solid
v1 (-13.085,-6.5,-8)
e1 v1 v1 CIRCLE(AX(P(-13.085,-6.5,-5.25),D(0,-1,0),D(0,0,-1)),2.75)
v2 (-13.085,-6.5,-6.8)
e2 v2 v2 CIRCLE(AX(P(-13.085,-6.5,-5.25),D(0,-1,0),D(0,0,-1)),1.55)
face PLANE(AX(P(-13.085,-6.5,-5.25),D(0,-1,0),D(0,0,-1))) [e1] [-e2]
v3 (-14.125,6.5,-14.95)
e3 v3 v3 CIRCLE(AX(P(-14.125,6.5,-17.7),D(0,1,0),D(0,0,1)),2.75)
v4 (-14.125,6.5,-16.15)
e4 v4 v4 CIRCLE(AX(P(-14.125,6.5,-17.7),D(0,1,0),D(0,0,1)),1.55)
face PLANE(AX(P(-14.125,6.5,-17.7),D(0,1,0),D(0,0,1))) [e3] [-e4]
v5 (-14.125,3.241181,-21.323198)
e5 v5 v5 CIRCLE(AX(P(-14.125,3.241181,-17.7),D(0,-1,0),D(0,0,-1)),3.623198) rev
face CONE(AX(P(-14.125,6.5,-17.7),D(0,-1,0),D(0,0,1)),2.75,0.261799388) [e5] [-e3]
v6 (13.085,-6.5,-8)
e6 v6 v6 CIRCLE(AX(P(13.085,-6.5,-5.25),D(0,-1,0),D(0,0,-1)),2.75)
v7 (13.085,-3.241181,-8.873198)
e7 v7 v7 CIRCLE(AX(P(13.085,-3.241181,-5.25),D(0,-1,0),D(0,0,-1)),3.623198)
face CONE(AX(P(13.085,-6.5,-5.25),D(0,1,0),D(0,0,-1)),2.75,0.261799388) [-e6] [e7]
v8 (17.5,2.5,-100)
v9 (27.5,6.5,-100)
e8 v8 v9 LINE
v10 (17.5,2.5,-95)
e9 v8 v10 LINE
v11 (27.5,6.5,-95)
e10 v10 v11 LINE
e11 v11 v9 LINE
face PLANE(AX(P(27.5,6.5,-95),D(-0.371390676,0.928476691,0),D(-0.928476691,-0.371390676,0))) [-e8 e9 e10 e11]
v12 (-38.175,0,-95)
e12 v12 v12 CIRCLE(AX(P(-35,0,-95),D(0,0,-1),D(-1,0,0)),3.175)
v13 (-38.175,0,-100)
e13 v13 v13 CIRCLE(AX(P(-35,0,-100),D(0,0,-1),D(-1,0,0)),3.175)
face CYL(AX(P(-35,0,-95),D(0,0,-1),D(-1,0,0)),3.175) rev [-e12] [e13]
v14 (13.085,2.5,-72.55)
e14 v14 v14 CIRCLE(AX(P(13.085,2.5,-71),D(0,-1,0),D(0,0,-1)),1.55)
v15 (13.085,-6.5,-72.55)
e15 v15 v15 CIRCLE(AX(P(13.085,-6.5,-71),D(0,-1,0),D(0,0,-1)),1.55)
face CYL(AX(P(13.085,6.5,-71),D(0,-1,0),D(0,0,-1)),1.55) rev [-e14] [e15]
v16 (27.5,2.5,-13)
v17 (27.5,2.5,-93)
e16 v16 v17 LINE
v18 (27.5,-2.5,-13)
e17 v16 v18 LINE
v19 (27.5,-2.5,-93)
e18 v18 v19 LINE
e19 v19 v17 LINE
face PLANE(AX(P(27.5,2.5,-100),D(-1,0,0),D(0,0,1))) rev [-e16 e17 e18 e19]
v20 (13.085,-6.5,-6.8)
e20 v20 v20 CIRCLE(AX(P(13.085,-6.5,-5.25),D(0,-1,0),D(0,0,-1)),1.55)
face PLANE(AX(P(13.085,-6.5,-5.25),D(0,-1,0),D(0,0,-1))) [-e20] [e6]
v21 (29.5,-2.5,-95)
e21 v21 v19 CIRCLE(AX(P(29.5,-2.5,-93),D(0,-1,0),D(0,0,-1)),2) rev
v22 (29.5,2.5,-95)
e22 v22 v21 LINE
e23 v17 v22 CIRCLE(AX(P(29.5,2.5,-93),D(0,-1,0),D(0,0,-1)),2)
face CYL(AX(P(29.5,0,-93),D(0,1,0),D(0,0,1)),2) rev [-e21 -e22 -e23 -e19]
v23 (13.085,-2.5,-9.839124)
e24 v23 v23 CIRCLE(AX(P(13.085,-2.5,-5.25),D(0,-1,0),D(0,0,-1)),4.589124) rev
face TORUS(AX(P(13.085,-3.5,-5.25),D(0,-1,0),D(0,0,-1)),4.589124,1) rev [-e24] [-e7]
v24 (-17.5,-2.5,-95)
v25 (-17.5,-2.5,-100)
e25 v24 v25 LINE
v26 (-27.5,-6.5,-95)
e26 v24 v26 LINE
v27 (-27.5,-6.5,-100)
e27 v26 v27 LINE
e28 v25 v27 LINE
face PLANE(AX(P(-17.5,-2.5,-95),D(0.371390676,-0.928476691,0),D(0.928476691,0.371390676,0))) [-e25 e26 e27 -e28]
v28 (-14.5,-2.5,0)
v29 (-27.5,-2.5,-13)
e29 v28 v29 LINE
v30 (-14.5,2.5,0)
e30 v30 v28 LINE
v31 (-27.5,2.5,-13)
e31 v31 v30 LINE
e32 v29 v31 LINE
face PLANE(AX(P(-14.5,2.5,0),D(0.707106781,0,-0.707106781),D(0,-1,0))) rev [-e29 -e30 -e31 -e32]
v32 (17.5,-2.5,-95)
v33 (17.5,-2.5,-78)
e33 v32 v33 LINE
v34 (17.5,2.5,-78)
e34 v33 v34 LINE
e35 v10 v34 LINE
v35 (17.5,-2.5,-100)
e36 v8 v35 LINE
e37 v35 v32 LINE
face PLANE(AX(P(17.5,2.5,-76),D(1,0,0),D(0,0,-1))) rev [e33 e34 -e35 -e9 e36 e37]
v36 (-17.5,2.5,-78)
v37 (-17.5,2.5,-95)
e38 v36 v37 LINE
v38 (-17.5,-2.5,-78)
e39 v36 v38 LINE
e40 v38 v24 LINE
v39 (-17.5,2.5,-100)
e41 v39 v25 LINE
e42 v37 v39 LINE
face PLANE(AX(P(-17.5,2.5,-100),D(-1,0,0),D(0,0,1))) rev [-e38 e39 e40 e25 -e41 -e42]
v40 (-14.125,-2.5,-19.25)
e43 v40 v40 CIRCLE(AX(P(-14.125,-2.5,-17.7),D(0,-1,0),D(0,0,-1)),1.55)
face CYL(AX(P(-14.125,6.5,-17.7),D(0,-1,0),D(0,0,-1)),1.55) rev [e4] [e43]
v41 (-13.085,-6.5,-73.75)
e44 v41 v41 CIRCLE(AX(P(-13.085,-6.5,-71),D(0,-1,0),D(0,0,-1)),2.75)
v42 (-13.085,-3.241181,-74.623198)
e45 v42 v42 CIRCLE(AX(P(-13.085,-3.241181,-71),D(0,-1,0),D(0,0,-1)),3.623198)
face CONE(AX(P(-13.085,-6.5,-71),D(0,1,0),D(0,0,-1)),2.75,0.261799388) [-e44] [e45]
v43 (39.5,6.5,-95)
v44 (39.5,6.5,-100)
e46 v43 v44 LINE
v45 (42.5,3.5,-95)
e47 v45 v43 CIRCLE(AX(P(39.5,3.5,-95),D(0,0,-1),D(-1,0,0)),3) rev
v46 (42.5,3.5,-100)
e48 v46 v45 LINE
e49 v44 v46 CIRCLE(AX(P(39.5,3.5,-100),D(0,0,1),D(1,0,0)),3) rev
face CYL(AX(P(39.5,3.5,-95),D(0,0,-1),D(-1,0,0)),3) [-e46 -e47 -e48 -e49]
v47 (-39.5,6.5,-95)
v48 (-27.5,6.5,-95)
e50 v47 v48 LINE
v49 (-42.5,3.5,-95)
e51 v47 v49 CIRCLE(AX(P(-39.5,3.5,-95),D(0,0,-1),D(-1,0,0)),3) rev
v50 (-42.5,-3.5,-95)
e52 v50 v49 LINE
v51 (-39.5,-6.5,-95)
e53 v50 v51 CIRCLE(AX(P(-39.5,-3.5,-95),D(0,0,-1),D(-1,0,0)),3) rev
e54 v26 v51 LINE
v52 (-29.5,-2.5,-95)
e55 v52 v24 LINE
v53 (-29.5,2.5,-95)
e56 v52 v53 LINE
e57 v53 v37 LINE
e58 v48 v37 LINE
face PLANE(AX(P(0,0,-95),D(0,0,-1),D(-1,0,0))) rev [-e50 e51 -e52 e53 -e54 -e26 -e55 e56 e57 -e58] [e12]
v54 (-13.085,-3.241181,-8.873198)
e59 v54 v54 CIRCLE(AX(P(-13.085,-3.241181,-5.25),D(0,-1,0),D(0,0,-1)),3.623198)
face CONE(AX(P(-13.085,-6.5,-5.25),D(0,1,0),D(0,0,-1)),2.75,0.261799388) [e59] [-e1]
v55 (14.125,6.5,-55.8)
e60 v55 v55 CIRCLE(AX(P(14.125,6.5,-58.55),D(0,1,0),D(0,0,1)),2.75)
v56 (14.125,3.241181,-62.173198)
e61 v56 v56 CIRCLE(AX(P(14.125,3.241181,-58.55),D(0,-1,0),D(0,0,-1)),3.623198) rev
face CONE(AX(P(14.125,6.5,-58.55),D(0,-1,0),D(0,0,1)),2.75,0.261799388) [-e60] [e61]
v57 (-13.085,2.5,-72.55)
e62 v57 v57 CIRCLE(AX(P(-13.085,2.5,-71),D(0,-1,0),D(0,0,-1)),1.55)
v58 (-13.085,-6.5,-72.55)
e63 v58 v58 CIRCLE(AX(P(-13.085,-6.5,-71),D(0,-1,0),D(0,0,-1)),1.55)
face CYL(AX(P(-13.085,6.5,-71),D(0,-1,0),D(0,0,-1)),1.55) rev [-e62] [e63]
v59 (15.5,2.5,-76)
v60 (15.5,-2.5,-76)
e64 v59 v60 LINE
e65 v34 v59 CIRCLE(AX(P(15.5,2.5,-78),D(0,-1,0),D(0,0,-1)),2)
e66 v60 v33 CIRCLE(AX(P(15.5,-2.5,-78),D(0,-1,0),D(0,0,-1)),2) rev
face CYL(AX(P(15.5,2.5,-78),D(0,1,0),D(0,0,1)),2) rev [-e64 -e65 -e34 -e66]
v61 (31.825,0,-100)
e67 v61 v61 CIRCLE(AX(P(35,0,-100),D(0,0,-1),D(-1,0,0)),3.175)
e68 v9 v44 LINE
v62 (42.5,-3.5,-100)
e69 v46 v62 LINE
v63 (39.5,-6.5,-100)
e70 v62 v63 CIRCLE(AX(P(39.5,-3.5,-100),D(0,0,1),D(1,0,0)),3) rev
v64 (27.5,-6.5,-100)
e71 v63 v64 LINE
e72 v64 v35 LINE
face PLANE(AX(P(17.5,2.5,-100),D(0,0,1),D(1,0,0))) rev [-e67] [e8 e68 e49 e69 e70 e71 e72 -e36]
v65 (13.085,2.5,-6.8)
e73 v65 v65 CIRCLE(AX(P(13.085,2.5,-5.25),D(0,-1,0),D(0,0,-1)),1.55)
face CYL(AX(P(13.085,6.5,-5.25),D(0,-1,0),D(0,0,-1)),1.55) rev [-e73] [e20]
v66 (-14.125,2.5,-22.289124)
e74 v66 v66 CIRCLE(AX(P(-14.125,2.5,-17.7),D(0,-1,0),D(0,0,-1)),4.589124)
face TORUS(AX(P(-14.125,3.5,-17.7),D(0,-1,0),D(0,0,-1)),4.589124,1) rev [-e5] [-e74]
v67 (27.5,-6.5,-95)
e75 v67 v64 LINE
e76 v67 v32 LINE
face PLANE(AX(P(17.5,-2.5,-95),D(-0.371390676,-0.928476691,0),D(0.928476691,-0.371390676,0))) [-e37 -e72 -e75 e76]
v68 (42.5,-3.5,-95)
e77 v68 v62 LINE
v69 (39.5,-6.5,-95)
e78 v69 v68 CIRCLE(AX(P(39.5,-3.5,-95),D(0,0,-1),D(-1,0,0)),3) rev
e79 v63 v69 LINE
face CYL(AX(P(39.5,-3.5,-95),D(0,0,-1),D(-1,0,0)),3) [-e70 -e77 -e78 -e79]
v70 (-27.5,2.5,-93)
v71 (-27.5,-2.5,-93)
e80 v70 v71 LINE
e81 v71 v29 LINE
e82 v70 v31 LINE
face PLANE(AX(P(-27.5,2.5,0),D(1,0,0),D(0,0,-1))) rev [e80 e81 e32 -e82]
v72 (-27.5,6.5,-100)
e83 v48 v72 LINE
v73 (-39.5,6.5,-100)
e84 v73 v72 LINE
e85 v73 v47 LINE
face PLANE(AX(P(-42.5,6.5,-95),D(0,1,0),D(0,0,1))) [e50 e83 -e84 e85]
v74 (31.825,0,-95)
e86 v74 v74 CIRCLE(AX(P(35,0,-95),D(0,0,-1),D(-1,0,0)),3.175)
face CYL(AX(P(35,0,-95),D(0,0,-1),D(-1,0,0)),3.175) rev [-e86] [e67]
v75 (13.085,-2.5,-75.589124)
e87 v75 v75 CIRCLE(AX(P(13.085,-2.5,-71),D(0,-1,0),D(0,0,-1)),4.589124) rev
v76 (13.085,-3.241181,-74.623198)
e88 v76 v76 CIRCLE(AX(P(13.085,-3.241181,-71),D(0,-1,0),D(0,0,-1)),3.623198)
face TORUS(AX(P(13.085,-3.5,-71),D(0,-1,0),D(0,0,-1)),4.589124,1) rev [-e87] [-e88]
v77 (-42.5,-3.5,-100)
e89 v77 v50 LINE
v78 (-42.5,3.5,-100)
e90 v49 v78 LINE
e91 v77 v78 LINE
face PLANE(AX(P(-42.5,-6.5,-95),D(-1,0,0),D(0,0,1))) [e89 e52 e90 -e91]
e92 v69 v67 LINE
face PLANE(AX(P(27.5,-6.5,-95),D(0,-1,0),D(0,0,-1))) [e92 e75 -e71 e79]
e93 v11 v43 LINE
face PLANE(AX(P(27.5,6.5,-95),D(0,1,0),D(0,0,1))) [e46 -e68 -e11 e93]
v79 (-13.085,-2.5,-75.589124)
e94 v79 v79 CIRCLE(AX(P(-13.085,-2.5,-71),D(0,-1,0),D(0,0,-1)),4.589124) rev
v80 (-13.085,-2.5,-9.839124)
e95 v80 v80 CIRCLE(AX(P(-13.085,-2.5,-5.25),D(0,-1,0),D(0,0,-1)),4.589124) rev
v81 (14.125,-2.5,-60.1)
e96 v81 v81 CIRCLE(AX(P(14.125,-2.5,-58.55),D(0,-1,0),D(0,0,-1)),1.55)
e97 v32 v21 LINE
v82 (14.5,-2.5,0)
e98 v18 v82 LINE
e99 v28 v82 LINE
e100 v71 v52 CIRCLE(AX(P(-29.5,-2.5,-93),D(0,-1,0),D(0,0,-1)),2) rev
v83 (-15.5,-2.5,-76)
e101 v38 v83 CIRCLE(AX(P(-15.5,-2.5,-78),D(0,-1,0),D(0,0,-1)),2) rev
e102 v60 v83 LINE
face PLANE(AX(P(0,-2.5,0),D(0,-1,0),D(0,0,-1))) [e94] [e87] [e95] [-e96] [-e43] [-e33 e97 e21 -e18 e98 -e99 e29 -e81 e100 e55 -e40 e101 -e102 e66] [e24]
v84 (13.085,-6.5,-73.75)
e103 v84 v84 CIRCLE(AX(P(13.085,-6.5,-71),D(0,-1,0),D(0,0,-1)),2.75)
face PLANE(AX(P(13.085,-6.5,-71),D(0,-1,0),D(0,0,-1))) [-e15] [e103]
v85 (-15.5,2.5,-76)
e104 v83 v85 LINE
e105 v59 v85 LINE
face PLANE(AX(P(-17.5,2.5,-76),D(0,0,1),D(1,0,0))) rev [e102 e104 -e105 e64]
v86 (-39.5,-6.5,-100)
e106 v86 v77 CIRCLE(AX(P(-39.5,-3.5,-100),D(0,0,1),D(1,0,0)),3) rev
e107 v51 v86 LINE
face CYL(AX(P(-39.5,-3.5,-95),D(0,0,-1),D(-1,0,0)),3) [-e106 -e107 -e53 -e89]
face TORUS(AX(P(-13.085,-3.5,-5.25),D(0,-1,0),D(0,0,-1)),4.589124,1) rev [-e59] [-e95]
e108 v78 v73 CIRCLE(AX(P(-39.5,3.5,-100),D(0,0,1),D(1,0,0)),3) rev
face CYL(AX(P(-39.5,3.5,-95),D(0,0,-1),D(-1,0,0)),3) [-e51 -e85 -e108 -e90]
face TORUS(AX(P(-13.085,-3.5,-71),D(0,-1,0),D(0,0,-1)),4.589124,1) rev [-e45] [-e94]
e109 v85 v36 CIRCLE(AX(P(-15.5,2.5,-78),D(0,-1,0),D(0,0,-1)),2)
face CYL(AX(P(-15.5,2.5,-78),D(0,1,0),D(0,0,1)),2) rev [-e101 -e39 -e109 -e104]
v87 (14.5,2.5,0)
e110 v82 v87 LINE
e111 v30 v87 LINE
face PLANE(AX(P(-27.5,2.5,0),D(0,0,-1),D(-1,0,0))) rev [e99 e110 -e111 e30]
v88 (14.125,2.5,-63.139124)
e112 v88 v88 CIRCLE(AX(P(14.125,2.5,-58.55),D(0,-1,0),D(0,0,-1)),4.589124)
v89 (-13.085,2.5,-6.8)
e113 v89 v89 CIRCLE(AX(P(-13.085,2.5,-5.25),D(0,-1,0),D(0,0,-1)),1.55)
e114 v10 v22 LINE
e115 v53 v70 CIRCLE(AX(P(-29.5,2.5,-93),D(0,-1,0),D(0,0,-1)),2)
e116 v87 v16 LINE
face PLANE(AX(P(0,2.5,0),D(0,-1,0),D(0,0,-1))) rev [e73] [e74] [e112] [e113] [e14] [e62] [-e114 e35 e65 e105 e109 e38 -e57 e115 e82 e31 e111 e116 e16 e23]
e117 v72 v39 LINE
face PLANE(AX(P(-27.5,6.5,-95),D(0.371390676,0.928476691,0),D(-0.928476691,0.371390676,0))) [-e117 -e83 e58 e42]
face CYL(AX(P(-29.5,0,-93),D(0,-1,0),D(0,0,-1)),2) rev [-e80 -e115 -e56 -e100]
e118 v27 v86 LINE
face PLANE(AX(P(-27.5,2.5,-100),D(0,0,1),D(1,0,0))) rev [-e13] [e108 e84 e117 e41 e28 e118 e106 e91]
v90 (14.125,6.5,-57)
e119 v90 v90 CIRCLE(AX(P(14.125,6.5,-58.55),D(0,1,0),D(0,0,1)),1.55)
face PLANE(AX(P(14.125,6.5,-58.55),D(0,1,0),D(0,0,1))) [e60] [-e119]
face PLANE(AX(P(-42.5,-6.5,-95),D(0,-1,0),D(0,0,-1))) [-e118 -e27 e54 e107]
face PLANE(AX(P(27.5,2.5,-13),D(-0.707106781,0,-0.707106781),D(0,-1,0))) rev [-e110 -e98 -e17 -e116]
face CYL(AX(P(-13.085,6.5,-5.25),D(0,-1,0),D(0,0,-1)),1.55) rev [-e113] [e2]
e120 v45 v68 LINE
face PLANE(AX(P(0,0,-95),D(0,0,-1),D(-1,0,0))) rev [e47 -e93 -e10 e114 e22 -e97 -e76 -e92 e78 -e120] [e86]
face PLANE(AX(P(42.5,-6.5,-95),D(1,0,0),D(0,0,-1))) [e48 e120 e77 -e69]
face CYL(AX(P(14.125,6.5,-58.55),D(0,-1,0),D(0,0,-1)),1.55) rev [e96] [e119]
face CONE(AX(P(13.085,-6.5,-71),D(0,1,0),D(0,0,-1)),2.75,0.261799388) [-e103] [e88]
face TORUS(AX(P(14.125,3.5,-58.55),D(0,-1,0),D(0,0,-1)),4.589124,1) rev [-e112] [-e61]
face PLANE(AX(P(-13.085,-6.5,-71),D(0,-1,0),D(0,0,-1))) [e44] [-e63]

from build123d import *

# Parameters (mm, degrees)
BOSS_EXTRUDE1_DEPTH = 2.5
SKETCH2_R           = 3.175
BOSS_EXTRUDE2_DEPTH = 5
FILLET1_R           = 3
SKETCH3_R           = 1.55
CUT_EXTRUDE1_DEPTH  = 110.028665955
FILLET2_R           = 2
BOSS_EXTRUDE3_START = 4
SKETCH4_R           = 2.75
SKETCH4_R_2         = 1.55
BOSS_EXTRUDE3_DEPTH = 4
SKETCH5_R           = 2.75
SKETCH5_R_2         = 1.55
BOSS_EXTRUDE4_DEPTH = 4
FILLET4_R           = 1
CHAMFER1_SIZE       = 13


# Read off the part's stored shape, not the designer's step: Draft1, Draft2
with BuildPart() as part:
    # Sketch1 → Boss-Extrude1 (new, symmetric)
    with BuildSketch(Plane(origin=(0, 0, 0), x_dir=(1, 0, 0), z_dir=(0, 1, 0))):
        Polygon((-27.5, 0), (-27.5, 100), (-17.5, 100), (-17.5, 76), (17.5, 76), (17.5, 100), (27.5, 100), (27.5, 0), align=None)
    extrude(amount=BOSS_EXTRUDE1_DEPTH, both=True)

    # Sketch2 → Boss-Extrude2 (add)
    # profile 1 of 2: a face of its own
    with BuildSketch(Plane(origin=(0, 0, -100), x_dir=(-1, 0, 0), z_dir=(0, 0, -1))):
        Polygon((-27.5, -6.5), (-42.5, -6.5), (-42.5, 6.5), (-27.5, 6.5), (-17.5, 2.5), (-17.5, -2.5), align=None)
        with Locations((-35, 0)):
            Circle(SKETCH2_R, mode=Mode.SUBTRACT)
    # profile 2 of 2: a face of its own
    with BuildSketch(Plane(origin=(0, 0, -100), x_dir=(-1, 0, 0), z_dir=(0, 0, -1))):
        Polygon((42.5, -6.5), (27.5, -6.5), (17.5, -2.5), (17.5, 2.5), (27.5, 6.5), (42.5, 6.5), align=None)
        with Locations((35, 0)):
            Circle(SKETCH2_R, mode=Mode.SUBTRACT)
    extrude(amount=-BOSS_EXTRUDE2_DEPTH)

    # Fillet1
    fillet1_edges = [part.edges().sort_by_distance(p)[0] for p in [
        (42.5, -6.5, -97.5),
        (42.5, 6.5, -97.5),
        (-42.5, 6.5, -97.5),
        (-42.5, -6.5, -97.5),
    ]]
    fillet(fillet1_edges, radius=FILLET1_R)

    # Sketch3 → Cut-Extrude1 (cut, through all)
    with BuildSketch(Plane.XZ.offset(2.5)):
        with Locations(Location((-13.085, -5.25, 0), (0, 0, 270))):
            Circle(SKETCH3_R)
        with Locations(Location((13.085, -5.25, 0), (0, 0, 270))):
            Circle(SKETCH3_R)
        with Locations(Location((13.085, -71, 0), (0, 0, 270))):
            Circle(SKETCH3_R)
        with Locations(Location((-13.085, -71, 0), (0, 0, 270))):
            Circle(SKETCH3_R)
        with Locations(Location((-14.125, -17.7, 0), (0, 0, 270))):
            Circle(SKETCH3_R)
        with Locations(Location((14.125, -58.55, 0), (0, 0, 270))):
            Circle(SKETCH3_R)
    extrude(amount=-CUT_EXTRUDE1_DEPTH, mode=Mode.SUBTRACT)

    # Fillet2
    fillet2_edges = [part.edges().sort_by_distance(p)[0] for p in [
        (-17.5, 0, -76),
        (17.5, 0, -76),
        (27.5, 0, -95),
        (-27.5, 0, -95),
    ]]
    fillet(fillet2_edges, radius=FILLET2_R)

    # Sketch4 → Boss-Extrude3 (add)
    # profile 1 of 4: a face of its own
    with BuildSketch(Plane.XZ.offset(2.5).offset(BOSS_EXTRUDE3_START)):
        with Locations(Location((-13.085, -5.25, 0), (0, 0, 270))):
            Circle(SKETCH4_R)
        with Locations(Location((-13.085, -5.25, 0), (0, 0, 270))):
            Circle(SKETCH4_R_2, mode=Mode.SUBTRACT)
    # profile 2 of 4: a face of its own
    with BuildSketch(Plane.XZ.offset(2.5).offset(BOSS_EXTRUDE3_START)):
        with Locations(Location((13.085, -5.25, 0), (0, 0, 270))):
            Circle(SKETCH4_R)
        with Locations(Location((13.085, -5.25, 0), (0, 0, 270))):
            Circle(SKETCH4_R_2, mode=Mode.SUBTRACT)
    # profile 3 of 4: a face of its own
    with BuildSketch(Plane.XZ.offset(2.5).offset(BOSS_EXTRUDE3_START)):
        with Locations(Location((-13.085, -71, 0), (0, 0, 270))):
            Circle(SKETCH4_R)
        with Locations(Location((-13.085, -71, 0), (0, 0, 270))):
            Circle(SKETCH4_R_2, mode=Mode.SUBTRACT)
    # profile 4 of 4: a face of its own
    with BuildSketch(Plane.XZ.offset(2.5).offset(BOSS_EXTRUDE3_START)):
        with Locations(Location((13.085, -71, 0), (0, 0, 270))):
            Circle(SKETCH4_R)
        with Locations(Location((13.085, -71, 0), (0, 0, 270))):
            Circle(SKETCH4_R_2, mode=Mode.SUBTRACT)
    extrude(amount=-BOSS_EXTRUDE3_DEPTH)

    # Sketch5 → Boss-Extrude4 (add)
    # profile 1 of 2: a face of its own
    with BuildSketch(Plane(origin=(0, 2.5, 0), x_dir=(1, 0, 0), z_dir=(0, 1, 0))):
        with Locations(Location((-14.125, 17.7, 0), (0, 0, 90))):
            Circle(SKETCH5_R)
        with Locations(Location((-14.125, 17.7, 0), (0, 0, 90))):
            Circle(SKETCH5_R_2, mode=Mode.SUBTRACT)
    # profile 2 of 2: a face of its own
    with BuildSketch(Plane(origin=(0, 2.5, 0), x_dir=(1, 0, 0), z_dir=(0, 1, 0))):
        with Locations(Location((14.125, 58.55, 0), (0, 0, 90))):
            Circle(SKETCH5_R)
        with Locations(Location((14.125, 58.55, 0), (0, 0, 90))):
            Circle(SKETCH5_R_2, mode=Mode.SUBTRACT)
    extrude(amount=BOSS_EXTRUDE4_DEPTH)

    # Draft1 outline → Draft1 (revolve)
    with BuildSketch(Plane(origin=(-13.085, 0, -5.25), x_dir=(1, 0, 0), z_dir=(0, 0, 1))):
        Polygon((2.75, -2.5), (2.75, -6.5), (3.82179677, -2.5), align=None)
    revolve(axis=Axis((-13.085, 0, -5.25), (0, 1, 0)))

    # Draft1 2 outline → Draft1 2 (revolve)
    with BuildSketch(Plane(origin=(13.085, 0, -5.25), x_dir=(1, 0, 0), z_dir=(0, 0, 1))):
        Polygon((2.75, -2.5), (2.75, -6.5), (3.82179677, -2.5), align=None)
    revolve(axis=Axis((13.085, 0, -5.25), (0, 1, 0)))

    # Draft1 3 outline → Draft1 3 (revolve)
    with BuildSketch(Plane(origin=(-13.085, 0, -71), x_dir=(1, 0, 0), z_dir=(0, 0, 1))):
        Polygon((2.75, -2.5), (2.75, -6.5), (3.82179677, -2.5), align=None)
    revolve(axis=Axis((-13.085, 0, -71), (0, 1, 0)))

    # Draft1 4 outline → Draft1 4 (revolve)
    with BuildSketch(Plane(origin=(13.085, 0, -71), x_dir=(1, 0, 0), z_dir=(0, 0, 1))):
        Polygon((2.75, -2.5), (2.75, -6.5), (3.82179677, -2.5), align=None)
    revolve(axis=Axis((13.085, 0, -71), (0, 1, 0)))

    # Draft2 outline → Draft2 (revolve)
    with BuildSketch(Plane(origin=(-14.125, 0, -17.7), x_dir=(1, 0, 0), z_dir=(0, 0, 1))):
        Polygon((3.82179677, 2.5), (2.75, 6.5), (2.75, 2.5), align=None)
    revolve(axis=Axis((-14.125, 0, -17.7), (0, 1, 0)))

    # Draft2 2 outline → Draft2 2 (revolve)
    with BuildSketch(Plane(origin=(14.125, 0, -58.55), x_dir=(1, 0, 0), z_dir=(0, 0, 1))):
        Polygon((3.82179677, 2.5), (2.75, 6.5), (2.75, 2.5), align=None)
    revolve(axis=Axis((14.125, 0, -58.55), (0, 1, 0)))

    # Fillet4
    fillet4_edges = [part.edges().sort_by_distance(p)[0] for p in [
        (-16.90679677, -2.5, -5.25),
        (9.26320323, -2.5, -5.25),
        (-16.90679677, -2.5, -71),
        (9.26320323, -2.5, -71),
        (-17.94679677, 2.5, -17.7),
        (10.30320323, 2.5, -58.55),
    ]]
    fillet(fillet4_edges, radius=FILLET4_R)

    # Chamfer1
    chamfer1_edges = [part.edges().sort_by_distance(p)[0] for p in [
        (-27.5, 0, 0),
        (27.5, 0, 0),
    ]]
    chamfer(chamfer1_edges, length=CHAMFER1_SIZE)


solid = part.part
